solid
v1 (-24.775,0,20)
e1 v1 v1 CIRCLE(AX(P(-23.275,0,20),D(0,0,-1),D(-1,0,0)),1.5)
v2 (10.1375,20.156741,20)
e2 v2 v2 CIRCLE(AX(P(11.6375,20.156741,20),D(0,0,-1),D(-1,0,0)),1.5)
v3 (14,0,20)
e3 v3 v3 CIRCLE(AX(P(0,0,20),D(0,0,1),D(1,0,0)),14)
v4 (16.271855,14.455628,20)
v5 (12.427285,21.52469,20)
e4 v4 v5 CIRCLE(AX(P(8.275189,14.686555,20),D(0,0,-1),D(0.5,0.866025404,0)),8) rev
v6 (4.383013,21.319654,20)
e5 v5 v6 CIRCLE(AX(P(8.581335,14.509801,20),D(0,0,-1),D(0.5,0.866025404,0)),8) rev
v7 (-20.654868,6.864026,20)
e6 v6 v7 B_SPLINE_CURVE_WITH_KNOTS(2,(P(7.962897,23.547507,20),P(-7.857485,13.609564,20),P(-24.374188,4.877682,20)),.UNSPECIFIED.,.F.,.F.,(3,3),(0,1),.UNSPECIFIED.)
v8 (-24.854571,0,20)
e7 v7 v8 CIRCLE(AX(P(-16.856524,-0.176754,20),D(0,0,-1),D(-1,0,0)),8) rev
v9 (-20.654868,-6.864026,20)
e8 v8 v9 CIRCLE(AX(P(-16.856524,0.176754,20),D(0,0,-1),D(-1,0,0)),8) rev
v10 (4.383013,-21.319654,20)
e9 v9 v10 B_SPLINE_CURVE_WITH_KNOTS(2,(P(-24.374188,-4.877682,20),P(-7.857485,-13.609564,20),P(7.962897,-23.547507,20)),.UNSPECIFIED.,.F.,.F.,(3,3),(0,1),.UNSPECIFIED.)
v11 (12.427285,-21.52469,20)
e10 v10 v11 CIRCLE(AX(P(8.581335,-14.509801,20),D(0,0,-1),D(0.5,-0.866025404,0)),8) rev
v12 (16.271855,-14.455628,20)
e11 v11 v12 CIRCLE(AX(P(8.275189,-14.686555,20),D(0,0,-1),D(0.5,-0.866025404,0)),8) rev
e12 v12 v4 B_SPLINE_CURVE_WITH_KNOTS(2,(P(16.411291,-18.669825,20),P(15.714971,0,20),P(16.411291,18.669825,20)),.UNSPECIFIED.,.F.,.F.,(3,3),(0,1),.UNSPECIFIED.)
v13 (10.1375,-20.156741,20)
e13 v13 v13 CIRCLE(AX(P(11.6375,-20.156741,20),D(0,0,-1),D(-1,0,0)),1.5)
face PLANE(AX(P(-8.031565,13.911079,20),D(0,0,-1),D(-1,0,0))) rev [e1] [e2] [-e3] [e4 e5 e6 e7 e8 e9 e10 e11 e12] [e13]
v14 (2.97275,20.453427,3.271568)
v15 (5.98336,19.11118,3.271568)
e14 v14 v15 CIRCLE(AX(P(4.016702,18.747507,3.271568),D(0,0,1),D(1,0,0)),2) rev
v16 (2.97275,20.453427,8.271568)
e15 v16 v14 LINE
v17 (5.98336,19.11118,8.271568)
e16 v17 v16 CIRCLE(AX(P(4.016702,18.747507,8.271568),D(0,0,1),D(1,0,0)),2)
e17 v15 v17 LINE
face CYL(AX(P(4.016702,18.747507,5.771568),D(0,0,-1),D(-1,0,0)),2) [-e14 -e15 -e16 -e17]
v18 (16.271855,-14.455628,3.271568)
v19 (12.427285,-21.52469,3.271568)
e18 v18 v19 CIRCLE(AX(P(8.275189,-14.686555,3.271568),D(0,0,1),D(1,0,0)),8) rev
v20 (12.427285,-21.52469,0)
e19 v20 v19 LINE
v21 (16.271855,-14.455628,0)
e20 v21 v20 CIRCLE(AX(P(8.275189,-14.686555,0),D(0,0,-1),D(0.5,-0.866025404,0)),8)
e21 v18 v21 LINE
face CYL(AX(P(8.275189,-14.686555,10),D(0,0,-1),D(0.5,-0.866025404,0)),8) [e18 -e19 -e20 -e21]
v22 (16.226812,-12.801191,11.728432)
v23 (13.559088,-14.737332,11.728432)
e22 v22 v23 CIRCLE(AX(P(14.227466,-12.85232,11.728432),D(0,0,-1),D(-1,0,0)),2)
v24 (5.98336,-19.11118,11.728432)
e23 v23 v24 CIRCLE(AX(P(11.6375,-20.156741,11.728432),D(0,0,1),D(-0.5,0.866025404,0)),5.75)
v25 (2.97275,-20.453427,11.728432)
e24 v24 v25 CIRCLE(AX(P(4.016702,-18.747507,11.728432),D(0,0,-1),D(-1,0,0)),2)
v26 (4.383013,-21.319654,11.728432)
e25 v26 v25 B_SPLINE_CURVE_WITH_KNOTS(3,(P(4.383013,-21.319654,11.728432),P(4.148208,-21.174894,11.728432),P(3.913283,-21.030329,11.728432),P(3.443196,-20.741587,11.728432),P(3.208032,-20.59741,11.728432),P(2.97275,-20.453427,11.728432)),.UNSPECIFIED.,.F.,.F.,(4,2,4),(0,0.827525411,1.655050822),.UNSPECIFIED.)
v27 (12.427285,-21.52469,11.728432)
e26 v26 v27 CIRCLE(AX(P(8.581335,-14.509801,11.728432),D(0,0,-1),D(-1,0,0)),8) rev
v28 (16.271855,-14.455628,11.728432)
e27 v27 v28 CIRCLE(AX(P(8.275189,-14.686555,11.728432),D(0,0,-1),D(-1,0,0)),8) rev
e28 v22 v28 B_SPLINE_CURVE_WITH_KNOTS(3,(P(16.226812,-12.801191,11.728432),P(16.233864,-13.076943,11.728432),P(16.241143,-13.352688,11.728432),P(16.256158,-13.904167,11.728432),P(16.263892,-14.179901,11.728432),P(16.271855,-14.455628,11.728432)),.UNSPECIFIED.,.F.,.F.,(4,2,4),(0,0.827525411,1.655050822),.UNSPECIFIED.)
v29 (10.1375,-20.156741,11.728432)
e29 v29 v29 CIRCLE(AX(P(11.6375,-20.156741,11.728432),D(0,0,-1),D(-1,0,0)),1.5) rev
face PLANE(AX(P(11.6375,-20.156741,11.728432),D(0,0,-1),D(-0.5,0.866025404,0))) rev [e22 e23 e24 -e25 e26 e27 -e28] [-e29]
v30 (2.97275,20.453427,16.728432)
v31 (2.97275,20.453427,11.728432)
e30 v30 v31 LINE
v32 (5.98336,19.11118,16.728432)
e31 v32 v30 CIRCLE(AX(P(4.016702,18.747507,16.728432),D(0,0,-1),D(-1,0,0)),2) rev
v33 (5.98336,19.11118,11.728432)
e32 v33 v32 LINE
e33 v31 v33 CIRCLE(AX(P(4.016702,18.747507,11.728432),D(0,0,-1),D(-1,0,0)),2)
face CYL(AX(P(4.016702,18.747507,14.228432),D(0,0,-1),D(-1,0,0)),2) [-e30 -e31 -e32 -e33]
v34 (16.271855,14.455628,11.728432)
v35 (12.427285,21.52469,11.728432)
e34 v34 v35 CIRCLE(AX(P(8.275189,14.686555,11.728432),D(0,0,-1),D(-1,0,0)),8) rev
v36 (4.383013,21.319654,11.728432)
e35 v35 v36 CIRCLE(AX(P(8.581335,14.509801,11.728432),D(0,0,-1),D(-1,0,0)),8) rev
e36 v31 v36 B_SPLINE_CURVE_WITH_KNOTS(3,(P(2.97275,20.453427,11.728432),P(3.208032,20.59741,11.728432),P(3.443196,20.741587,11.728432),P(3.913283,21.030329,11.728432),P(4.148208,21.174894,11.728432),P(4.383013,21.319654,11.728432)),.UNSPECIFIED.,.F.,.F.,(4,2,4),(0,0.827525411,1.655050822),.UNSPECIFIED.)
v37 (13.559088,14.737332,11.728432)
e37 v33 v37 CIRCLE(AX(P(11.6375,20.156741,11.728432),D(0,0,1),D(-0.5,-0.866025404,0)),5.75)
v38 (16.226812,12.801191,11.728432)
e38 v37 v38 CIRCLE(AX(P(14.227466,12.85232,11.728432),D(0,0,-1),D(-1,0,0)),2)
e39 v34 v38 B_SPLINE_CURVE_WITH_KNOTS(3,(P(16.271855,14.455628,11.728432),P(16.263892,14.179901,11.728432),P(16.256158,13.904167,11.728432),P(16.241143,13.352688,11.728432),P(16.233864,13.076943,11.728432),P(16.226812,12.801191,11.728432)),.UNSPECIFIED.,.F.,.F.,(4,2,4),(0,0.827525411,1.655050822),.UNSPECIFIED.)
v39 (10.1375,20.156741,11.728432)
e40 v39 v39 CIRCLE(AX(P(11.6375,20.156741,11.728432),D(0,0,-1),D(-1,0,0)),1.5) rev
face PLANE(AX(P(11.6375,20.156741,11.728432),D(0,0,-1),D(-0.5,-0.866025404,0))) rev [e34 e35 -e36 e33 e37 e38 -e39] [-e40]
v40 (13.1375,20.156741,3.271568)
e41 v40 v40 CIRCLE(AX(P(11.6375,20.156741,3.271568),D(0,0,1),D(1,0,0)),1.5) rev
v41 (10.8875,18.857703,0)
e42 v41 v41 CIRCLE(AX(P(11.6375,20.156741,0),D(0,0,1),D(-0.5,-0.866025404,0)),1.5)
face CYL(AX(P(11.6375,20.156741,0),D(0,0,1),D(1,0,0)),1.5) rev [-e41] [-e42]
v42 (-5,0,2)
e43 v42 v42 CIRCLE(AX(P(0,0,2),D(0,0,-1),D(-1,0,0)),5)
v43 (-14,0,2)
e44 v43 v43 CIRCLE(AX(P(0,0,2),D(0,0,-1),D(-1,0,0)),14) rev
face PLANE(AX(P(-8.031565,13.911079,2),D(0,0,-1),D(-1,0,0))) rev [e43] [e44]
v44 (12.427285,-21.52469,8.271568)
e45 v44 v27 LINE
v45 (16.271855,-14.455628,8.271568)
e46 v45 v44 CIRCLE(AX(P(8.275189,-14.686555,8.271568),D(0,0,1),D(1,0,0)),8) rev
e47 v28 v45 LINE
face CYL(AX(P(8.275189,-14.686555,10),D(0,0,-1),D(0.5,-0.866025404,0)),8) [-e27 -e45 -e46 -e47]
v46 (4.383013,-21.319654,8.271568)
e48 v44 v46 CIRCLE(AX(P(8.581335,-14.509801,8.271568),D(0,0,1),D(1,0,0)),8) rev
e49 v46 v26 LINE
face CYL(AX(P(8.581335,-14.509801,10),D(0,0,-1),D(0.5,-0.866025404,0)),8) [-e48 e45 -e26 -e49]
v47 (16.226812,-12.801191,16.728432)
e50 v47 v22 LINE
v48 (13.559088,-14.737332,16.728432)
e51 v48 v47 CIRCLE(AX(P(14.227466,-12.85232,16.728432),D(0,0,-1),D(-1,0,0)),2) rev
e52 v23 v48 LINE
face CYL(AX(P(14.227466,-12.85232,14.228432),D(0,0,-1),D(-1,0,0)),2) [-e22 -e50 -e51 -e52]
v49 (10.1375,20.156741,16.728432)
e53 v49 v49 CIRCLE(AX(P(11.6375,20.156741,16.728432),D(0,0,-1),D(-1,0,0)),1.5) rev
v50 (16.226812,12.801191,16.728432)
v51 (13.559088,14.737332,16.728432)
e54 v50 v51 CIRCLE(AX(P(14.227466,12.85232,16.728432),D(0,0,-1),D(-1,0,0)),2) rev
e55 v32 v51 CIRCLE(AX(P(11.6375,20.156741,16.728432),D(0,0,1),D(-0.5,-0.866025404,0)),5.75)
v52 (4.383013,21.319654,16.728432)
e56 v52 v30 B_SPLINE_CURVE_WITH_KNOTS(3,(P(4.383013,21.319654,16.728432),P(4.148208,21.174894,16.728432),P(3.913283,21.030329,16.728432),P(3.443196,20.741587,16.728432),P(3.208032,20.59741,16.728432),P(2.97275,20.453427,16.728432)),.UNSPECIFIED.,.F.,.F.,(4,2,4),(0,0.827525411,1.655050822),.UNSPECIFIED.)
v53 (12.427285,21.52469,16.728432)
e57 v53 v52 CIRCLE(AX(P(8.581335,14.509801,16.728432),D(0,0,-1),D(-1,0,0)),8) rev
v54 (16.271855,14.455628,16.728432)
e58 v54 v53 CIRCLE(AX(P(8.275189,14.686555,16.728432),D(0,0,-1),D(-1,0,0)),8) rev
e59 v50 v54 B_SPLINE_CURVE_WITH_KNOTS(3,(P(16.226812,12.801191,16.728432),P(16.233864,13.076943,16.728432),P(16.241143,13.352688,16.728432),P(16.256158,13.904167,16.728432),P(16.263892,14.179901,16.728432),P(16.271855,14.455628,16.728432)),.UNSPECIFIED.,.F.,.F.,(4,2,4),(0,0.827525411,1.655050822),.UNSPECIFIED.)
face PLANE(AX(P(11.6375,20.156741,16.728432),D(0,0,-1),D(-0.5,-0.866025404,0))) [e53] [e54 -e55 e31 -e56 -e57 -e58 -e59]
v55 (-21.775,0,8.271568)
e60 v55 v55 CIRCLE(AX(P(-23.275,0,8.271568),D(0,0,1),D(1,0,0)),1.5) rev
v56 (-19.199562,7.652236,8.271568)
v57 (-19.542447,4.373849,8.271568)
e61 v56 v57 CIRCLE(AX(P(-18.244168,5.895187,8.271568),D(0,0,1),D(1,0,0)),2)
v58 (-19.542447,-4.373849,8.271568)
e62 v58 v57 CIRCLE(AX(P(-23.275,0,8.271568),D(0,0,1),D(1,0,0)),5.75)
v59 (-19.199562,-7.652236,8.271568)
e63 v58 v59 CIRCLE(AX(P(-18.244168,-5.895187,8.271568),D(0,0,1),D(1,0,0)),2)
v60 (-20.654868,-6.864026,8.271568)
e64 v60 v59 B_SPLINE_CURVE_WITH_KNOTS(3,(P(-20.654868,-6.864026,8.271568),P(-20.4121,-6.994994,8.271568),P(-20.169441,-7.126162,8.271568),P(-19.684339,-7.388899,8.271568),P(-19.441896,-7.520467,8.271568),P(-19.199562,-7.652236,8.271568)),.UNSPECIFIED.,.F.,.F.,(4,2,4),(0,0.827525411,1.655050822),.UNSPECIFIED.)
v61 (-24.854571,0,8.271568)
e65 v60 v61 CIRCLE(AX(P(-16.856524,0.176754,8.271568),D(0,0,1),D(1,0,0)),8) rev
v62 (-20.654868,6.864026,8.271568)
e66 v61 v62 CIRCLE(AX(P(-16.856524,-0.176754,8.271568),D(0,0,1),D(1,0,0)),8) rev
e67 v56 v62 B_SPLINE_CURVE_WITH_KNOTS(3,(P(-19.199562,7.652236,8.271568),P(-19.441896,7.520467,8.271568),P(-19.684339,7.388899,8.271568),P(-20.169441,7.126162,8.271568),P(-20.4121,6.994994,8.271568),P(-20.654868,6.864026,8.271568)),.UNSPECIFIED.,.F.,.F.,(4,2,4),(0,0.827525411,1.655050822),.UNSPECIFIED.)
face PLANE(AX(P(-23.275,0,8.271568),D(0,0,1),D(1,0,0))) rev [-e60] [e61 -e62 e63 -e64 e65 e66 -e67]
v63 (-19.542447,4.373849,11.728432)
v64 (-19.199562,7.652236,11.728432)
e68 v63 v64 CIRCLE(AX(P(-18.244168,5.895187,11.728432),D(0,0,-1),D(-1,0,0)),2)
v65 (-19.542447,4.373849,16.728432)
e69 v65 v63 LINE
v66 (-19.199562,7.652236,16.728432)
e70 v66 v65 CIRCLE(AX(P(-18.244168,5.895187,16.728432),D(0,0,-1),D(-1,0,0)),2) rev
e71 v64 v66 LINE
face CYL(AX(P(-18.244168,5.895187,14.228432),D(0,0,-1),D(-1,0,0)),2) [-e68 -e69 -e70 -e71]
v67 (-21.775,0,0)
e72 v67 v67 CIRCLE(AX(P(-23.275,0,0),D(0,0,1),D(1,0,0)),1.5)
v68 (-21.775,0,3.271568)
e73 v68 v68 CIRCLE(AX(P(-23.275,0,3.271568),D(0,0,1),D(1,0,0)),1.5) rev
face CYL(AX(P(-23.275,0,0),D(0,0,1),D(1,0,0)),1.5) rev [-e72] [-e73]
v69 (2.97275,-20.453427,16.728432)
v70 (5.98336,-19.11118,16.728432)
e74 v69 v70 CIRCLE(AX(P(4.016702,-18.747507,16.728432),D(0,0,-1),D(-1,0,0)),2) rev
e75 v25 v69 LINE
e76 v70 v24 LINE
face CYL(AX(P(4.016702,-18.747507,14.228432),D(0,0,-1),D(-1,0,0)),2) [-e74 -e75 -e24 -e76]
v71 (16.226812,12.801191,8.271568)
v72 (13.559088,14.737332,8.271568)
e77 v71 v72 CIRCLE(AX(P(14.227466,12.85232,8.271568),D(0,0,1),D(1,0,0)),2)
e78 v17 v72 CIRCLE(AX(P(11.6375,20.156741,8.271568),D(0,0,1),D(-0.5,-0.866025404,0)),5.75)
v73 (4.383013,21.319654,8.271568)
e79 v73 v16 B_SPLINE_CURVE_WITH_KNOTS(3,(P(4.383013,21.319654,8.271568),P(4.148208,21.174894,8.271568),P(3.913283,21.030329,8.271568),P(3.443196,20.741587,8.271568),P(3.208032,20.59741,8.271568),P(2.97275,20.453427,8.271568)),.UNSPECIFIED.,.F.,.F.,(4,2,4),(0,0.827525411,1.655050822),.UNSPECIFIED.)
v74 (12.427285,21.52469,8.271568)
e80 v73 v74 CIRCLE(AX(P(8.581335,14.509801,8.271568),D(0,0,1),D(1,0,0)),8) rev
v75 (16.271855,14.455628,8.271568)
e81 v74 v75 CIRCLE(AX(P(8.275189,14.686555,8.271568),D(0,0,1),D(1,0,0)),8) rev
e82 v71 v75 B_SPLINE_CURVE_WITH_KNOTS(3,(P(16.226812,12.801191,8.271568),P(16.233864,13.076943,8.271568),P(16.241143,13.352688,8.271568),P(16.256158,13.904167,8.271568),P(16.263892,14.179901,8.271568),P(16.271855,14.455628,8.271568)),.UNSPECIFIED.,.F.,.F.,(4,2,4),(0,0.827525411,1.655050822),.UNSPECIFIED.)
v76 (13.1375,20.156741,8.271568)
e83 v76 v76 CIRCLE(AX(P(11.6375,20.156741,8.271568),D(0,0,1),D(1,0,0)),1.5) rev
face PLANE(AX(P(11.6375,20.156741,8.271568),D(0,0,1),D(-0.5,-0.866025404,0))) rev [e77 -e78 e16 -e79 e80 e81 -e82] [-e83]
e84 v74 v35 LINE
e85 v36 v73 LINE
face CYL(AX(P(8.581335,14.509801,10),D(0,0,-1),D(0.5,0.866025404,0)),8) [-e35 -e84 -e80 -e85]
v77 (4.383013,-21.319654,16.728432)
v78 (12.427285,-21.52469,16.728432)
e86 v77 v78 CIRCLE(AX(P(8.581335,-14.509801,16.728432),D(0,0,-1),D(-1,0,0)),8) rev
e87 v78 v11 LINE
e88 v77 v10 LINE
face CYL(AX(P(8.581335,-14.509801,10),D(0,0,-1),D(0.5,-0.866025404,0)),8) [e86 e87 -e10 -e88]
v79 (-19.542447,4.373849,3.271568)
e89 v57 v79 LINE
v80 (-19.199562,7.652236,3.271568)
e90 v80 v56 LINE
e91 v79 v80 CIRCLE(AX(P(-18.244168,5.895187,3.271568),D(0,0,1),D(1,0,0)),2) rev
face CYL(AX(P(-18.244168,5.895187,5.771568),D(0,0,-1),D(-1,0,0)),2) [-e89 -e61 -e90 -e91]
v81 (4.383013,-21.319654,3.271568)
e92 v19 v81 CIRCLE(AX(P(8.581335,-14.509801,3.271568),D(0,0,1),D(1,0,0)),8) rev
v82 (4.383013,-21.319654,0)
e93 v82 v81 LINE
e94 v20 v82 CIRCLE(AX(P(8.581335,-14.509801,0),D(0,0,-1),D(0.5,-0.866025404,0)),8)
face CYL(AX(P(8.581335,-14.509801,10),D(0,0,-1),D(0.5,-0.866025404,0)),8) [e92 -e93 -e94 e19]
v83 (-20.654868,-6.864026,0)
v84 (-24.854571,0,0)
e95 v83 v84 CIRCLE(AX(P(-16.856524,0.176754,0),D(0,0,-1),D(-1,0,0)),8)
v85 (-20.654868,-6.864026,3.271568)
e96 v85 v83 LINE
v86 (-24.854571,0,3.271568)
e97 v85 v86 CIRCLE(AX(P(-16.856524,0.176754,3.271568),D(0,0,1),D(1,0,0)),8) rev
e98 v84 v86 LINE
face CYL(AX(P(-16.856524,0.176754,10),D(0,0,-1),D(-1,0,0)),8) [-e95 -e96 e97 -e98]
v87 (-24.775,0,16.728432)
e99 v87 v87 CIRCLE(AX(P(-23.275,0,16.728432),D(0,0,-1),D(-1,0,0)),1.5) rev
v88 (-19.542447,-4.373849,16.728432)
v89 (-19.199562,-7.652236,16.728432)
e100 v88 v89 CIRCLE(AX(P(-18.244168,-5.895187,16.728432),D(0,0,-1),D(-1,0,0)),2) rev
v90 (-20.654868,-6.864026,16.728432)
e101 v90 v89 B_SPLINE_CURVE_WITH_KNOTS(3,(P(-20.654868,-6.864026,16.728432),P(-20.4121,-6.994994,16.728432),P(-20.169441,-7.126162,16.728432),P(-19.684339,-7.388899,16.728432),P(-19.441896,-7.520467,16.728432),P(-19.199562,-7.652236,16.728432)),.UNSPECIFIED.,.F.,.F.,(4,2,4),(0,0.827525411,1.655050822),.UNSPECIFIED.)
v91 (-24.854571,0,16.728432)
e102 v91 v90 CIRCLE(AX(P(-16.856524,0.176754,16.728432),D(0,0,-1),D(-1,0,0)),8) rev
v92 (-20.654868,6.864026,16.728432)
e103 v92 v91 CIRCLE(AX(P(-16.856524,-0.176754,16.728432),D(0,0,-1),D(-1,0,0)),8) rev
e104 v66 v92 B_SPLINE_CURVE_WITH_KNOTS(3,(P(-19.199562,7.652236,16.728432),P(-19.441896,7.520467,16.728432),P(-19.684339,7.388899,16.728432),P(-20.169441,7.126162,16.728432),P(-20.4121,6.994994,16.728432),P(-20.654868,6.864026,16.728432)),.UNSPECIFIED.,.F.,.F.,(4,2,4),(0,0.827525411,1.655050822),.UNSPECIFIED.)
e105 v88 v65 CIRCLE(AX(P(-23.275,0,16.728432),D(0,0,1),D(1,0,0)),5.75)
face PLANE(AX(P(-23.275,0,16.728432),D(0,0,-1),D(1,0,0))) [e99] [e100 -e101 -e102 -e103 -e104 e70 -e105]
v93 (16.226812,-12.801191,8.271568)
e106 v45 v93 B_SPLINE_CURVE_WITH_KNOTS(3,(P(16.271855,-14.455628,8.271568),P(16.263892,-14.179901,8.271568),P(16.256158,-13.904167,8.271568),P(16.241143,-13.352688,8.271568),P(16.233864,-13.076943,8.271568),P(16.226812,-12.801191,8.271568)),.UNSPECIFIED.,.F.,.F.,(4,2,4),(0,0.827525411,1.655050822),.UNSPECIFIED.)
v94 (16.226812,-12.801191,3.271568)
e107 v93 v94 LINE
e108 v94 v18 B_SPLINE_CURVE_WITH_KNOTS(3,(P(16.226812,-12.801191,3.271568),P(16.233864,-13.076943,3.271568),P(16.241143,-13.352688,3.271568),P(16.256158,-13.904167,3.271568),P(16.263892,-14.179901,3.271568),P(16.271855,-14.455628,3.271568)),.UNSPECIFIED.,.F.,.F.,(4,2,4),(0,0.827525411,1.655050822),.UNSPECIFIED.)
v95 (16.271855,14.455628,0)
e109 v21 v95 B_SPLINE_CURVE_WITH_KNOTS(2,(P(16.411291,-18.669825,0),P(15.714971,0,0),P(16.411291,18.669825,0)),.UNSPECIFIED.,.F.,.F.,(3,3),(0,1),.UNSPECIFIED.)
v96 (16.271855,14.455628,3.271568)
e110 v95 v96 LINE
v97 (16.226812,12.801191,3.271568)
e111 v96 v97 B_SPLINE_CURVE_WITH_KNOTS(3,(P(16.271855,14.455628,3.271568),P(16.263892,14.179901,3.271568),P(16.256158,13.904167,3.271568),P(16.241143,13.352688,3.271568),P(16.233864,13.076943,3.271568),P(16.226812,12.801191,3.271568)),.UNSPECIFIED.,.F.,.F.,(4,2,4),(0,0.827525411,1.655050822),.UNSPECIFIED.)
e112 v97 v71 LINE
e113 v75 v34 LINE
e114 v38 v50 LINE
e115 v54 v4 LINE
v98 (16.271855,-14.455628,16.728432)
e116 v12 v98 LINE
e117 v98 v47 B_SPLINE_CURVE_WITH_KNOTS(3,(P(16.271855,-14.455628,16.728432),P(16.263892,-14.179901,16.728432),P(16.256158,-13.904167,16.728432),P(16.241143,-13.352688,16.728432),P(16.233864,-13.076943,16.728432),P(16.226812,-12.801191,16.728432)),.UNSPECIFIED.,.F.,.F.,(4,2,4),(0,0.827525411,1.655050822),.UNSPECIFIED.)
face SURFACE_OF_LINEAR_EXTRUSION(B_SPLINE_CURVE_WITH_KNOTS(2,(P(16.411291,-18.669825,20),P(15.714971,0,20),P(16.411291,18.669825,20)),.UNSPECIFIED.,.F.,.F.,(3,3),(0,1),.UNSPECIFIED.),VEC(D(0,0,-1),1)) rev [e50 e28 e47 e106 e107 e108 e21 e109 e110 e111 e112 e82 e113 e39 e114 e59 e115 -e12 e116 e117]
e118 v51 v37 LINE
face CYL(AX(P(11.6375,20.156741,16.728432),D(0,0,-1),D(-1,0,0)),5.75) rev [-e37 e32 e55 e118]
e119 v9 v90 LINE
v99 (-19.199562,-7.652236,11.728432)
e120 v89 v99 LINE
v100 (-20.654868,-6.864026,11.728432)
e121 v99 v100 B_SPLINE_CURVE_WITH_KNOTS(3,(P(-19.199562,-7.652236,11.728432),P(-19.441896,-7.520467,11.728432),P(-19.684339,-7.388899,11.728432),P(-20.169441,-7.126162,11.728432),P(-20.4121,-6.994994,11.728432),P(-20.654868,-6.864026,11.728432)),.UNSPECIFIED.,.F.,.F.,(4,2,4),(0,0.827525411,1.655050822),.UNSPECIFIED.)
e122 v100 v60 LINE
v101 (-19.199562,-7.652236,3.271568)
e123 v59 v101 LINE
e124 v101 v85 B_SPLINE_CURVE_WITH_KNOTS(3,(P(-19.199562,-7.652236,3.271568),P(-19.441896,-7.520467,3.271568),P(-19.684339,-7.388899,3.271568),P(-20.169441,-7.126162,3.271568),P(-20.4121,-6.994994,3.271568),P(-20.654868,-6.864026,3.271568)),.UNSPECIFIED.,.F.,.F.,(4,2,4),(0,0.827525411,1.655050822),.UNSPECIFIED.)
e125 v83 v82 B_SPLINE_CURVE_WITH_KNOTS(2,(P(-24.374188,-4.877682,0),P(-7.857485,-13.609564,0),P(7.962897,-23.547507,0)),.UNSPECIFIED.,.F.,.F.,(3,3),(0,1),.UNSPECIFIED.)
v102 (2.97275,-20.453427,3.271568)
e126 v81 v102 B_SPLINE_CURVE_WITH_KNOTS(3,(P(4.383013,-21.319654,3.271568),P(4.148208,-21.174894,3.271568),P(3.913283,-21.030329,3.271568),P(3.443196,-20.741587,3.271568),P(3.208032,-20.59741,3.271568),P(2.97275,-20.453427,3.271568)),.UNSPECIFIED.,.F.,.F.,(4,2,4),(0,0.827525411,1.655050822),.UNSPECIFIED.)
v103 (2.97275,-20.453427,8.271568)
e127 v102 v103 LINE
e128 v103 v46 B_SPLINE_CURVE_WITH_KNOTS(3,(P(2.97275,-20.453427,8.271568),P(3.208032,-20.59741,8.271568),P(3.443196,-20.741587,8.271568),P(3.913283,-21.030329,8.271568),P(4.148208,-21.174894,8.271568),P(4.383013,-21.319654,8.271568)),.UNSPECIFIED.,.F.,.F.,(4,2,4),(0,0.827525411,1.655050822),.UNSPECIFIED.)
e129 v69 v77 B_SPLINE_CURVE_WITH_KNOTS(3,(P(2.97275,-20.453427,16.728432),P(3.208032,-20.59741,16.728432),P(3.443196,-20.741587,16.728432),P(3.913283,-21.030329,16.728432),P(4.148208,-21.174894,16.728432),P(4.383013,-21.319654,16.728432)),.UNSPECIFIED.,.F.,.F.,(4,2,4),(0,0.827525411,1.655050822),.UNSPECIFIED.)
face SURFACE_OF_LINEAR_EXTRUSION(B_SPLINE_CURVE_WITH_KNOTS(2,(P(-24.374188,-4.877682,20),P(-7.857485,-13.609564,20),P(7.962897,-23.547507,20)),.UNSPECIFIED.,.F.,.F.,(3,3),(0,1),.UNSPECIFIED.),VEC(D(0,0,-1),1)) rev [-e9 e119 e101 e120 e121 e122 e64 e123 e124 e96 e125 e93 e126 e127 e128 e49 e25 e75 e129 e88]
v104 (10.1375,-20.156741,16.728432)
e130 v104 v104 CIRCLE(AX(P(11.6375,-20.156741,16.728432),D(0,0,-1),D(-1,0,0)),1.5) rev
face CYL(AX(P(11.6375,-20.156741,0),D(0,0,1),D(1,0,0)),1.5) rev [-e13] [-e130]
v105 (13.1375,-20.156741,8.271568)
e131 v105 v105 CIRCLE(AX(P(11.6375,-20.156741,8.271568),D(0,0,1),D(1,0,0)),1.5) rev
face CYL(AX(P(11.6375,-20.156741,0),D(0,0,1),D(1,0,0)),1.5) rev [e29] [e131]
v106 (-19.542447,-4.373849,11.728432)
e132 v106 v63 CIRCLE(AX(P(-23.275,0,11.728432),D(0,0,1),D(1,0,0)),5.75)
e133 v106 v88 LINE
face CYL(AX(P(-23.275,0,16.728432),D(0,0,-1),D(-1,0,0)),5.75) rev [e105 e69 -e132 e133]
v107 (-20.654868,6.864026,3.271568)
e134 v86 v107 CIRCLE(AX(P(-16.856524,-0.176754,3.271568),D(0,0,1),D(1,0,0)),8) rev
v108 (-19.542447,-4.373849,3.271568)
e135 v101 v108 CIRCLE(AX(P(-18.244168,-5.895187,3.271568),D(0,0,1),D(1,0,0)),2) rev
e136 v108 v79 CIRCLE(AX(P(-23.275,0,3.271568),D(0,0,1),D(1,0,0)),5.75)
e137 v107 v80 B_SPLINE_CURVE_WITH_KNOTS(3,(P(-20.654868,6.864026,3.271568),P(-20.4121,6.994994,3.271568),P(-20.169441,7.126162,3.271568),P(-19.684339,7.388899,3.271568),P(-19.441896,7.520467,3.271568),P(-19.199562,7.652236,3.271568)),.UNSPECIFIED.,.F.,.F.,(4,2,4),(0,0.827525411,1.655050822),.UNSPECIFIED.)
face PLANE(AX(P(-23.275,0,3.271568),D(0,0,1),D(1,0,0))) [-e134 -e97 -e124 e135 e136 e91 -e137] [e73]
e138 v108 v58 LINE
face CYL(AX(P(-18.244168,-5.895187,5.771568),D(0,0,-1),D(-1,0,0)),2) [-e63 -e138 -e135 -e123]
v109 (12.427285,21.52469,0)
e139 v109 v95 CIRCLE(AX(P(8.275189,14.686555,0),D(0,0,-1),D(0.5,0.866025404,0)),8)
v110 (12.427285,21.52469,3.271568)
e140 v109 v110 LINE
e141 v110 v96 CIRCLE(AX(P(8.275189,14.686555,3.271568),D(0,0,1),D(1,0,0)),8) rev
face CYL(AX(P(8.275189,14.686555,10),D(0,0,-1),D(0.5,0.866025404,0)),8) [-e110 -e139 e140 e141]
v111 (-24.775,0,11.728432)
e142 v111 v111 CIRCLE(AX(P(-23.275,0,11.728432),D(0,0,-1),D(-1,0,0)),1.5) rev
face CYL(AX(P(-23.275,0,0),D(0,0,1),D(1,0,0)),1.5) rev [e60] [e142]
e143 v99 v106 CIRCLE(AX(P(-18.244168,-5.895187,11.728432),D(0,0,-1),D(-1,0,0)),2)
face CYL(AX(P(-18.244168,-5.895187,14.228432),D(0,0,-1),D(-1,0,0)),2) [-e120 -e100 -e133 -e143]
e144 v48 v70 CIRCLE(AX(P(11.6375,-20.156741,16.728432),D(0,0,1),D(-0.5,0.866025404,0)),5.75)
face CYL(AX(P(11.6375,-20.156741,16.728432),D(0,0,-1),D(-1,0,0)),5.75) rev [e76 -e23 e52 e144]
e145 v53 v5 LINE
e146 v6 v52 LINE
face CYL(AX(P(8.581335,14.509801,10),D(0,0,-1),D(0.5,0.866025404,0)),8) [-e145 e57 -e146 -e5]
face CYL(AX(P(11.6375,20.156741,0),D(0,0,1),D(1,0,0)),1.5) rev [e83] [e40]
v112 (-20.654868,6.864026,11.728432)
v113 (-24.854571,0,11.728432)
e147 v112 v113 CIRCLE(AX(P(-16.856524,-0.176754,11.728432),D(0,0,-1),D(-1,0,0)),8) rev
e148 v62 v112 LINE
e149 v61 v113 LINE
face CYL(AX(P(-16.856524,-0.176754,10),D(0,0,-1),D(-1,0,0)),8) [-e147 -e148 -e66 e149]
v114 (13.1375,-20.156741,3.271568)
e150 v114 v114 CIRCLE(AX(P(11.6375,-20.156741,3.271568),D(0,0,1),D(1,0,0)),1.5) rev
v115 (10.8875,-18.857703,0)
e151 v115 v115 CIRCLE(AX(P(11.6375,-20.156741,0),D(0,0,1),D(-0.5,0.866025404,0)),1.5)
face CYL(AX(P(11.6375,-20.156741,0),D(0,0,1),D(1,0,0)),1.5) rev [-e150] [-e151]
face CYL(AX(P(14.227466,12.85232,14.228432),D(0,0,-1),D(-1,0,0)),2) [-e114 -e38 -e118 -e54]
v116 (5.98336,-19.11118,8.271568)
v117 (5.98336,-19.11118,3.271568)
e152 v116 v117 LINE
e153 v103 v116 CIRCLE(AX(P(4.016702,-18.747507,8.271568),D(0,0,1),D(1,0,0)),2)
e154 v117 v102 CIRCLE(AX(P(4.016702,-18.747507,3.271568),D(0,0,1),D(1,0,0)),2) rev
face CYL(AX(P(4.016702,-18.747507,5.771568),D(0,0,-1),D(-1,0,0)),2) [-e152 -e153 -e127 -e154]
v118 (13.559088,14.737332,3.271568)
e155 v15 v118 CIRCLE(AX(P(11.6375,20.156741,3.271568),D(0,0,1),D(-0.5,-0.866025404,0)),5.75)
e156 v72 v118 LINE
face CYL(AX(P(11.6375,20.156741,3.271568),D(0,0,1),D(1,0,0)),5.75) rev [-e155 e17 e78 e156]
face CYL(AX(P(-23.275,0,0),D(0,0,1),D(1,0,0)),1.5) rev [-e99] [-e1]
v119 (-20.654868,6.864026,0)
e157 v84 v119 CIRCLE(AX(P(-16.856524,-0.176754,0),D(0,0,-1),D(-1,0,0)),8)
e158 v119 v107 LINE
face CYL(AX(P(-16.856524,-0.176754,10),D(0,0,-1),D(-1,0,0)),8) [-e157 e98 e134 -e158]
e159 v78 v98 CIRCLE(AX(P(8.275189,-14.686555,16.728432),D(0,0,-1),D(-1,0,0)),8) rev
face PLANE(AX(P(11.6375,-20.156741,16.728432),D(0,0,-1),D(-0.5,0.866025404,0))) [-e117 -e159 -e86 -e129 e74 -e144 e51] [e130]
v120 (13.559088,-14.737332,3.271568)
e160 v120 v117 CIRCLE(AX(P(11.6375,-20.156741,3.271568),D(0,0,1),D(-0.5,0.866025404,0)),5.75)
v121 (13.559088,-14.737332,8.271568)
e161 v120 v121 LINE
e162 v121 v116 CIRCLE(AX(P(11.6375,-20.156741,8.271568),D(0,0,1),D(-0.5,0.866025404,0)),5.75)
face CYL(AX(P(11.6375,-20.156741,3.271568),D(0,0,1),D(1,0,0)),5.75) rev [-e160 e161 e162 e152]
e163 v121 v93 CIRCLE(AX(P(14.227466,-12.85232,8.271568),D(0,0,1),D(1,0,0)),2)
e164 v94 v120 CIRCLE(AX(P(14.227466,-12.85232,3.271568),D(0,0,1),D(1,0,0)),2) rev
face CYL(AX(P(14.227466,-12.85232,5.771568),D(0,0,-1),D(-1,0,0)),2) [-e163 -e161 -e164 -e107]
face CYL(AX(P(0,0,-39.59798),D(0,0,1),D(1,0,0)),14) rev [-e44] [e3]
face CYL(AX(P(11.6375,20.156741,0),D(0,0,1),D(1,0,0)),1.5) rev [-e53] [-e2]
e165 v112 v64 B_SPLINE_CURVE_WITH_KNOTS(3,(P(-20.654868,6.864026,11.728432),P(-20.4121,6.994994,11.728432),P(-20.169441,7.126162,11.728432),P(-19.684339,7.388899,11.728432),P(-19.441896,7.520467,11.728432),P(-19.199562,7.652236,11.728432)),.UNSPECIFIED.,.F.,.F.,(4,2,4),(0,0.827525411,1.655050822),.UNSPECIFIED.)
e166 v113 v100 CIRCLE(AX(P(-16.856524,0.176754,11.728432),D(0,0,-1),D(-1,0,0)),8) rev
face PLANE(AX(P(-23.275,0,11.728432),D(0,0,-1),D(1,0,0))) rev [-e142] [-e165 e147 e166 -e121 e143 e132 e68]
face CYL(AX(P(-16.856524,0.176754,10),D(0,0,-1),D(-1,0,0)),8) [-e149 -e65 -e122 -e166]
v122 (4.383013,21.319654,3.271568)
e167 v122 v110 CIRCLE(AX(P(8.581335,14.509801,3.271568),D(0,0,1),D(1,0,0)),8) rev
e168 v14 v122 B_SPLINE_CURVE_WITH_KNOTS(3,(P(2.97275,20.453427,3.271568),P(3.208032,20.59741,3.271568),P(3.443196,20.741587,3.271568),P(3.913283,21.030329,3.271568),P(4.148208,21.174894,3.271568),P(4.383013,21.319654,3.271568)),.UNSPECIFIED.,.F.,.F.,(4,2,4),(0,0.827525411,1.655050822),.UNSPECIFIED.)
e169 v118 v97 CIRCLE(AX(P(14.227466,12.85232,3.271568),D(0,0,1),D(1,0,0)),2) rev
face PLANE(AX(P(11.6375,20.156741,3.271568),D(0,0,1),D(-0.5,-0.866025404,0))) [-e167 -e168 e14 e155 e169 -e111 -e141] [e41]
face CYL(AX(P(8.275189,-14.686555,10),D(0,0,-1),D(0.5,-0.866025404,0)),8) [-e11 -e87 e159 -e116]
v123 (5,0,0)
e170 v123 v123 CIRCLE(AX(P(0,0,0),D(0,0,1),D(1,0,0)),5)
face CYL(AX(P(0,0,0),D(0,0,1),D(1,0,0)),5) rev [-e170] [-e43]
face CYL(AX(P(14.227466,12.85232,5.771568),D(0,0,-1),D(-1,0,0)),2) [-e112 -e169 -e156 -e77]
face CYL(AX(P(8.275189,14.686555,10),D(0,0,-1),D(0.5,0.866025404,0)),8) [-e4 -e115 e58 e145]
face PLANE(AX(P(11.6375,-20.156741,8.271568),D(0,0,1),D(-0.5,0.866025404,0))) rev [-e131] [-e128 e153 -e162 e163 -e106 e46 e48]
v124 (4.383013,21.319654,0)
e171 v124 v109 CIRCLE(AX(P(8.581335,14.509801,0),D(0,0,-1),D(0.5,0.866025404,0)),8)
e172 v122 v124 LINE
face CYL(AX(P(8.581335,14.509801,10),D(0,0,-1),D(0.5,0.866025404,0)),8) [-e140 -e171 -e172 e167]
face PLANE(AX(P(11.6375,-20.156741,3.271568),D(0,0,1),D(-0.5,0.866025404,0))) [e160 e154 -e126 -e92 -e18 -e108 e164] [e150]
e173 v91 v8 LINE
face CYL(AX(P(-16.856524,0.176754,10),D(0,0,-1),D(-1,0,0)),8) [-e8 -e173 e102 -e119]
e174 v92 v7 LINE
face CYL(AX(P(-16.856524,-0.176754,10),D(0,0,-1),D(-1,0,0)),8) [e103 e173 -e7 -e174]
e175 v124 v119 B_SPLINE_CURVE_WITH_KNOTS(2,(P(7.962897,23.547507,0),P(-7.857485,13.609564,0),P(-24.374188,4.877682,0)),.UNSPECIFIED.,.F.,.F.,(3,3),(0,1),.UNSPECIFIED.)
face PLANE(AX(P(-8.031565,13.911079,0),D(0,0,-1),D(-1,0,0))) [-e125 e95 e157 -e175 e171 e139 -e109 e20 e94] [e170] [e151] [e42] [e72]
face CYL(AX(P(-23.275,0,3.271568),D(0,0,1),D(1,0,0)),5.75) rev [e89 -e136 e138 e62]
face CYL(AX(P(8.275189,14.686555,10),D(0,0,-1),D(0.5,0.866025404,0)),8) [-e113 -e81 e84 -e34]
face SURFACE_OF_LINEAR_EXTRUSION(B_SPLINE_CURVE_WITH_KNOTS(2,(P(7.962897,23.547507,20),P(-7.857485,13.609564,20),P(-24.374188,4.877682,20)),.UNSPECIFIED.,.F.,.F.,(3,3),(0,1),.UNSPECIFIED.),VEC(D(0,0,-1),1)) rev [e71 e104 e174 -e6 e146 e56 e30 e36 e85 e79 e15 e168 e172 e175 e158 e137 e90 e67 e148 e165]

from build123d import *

# Parameters (mm, degrees)
BOSS_EXTRUDE1_DEPTH     = 20
SKETCH4_R               = 14
CUT_EXTRUDE3_DEPTH      = 18
CUT_EXTRUDE4_DEPTH      = 39.683044831
CUT_EXTRUDE4_DEPTH_BACK = 39.683044831
SKETCH5_R               = 5
FILLET2_R               = 8
CIRPATTERN2_DEPTH       = 20
SKETCH2_R               = 1.5
CUT_EXTRUDE1_DEPTH      = 40.044088383
CIRPATTERN10_COUNT      = 3
SKETCH3_R               = 5.75
CUT_EXTRUDE2_DEPTH      = 2.5
CIRPATTERN3_COUNT       = 3
FILLET3_R               = 2
MIRROR1_START           = 11.728432102
MIRROR1_OUTLINE_R       = 1.5
MIRROR1_DEPTH           = 5


# Read off the part's stored shape, not the designer's step: CirPattern2, Mirror1
with BuildPart() as part:
    # Sketch1 → Boss-Extrude1 (new body)
    with BuildSketch(Plane.XY):
        with BuildLine():
            ThreePointArc((-24.374188266, 4.877682355), (-24.857450368, 0), (-24.374188266, -4.877682355))
            add(Edge.make_bspline(
                [(7.962897302, -23.547507412), (-7.857485411, -13.609563951), (-24.374188266, -4.877682355)],
                knots=[0, 0, 0, 1, 1, 1], degree=2))
            ThreePointArc((7.962897302, -23.547507412), (12.428725184, -21.527183492), (16.411290964, -18.669825058))
            add(Edge.make_bspline(
                [(16.411290964, 18.669825058), (15.714970822, 0), (16.411290964, -18.669825058)],
                knots=[0, 0, 0, 1, 1, 1], degree=2))
            ThreePointArc((16.411290964, 18.669825058), (12.428725184, 21.527183492), (7.962897302, 23.547507412))
            add(Edge.make_bspline(
                [(-24.374188266, 4.877682355), (-7.857485411, 13.609563951), (7.962897302, 23.547507412)],
                knots=[0, 0, 0, 1, 1, 1], degree=2))
        make_face()
    extrude(amount=BOSS_EXTRUDE1_DEPTH)

    # Sketch4 → Cut-Extrude3 (cut)
    with BuildSketch(Plane.XY.offset(20)):
        Circle(SKETCH4_R)
    extrude(amount=-CUT_EXTRUDE3_DEPTH, mode=Mode.SUBTRACT)

    # Sketch5 → Cut-Extrude4 (cut, two sides: drawn at the far end of the back side and taken through both)
    with BuildSketch(Plane.XY.offset(2).offset(-CUT_EXTRUDE4_DEPTH_BACK)):
        Circle(SKETCH5_R)
    extrude(amount=CUT_EXTRUDE4_DEPTH + CUT_EXTRUDE4_DEPTH_BACK, mode=Mode.SUBTRACT)

    # Fillet2
    # the kernel refuses this fillet: 8 mm, written as the material it takes off along each edge
    with BuildSketch(Plane(origin=(-24.374188266, -4.877682355, -12.902163969), x_dir=(-0.09337496736268357, 0.9956310137144271, 0), z_dir=(0, 0, 1))) as fillet2_piece_1:
        with BuildLine():
            CenterArc((4.330391744, -7.956777815), FILLET2_R, 84.041434424, 62.254890411)
            ThreePointArc((-2.324956501, -3.517595487), (-1.158780615, -1.761241696), (0, 0))
            ThreePointArc((0, 0), (2.580432794, 0.134299165), (5.160865588, 0))
        make_face()
    extrude(amount=45.804327938, mode=Mode.SUBTRACT)
    with BuildSketch(Plane(origin=(-24.374188266, 4.877682355, -12.902163969), x_dir=(0.8820863080273184, 0.4710878317158435, 0), z_dir=(0, 0, 1))) as fillet2_piece_2:
        with BuildLine():
            CenterArc((4.250145603, -7.999929262), FILLET2_R, 90.240945395, 62.254890411)
            ThreePointArc((-2.845672568, -4.30542463), (-1.534874647, -2.078660503), (0, 0))
            ThreePointArc((0, 0), (2.108251688, -0.004432315), (4.216503379, 0))
        make_face()
    extrude(amount=45.804327938, mode=Mode.SUBTRACT)

    # CirPattern2 outline → CirPattern2 (cut)
    with BuildSketch(Plane.XY):
        with BuildLine():
            add(Edge.make_bspline(
                [(16.411290964, -18.669825058), (16.332703446, -16.562726441), (16.27185489, -14.455627824)],
                knots=[0, 0, 0, 0.112861187, 0.112861187, 0.112861187], degree=2))
            ThreePointArc((16.27185489, -14.455627824), (15.303063117, -18.508724044), (12.427285417, -21.524689742))
            ThreePointArc((12.427285417, -21.524689742), (8.377493655, -22.507203437), (4.383013478, -21.319653613))
            add(Edge.make_bspline(
                [(4.383013478, -21.319653613), (6.17739013, -22.425899317), (7.962897302, -23.547507412)],
                knots=[0.887138813, 0.887138813, 0.887138813, 1, 1, 1], degree=2))
            ThreePointArc((7.962897302, -23.547507412), (12.428725184, -21.527183492), (16.411290964, -18.669825058))
        make_face()
        with BuildLine():
            ThreePointArc((12.427285417, 21.524689742), (15.303063117, 18.508724044), (16.271854889, 14.455627824))
            add(Edge.make_bspline(
                [(16.271854889, 14.455627824), (16.332703446, 16.562726441), (16.411290964, 18.669825058)],
                knots=[0.887138813, 0.887138813, 0.887138813, 1, 1, 1], degree=2))
            ThreePointArc((16.411290964, 18.669825058), (12.428725184, 21.527183492), (7.962897302, 23.547507412))
            add(Edge.make_bspline(
                [(7.962897302, 23.547507412), (6.17739013, 22.425899317), (4.383013478, 21.319653613)],
                knots=[0, 0, 0, 0.112861187, 0.112861187, 0.112861187], degree=2))
            ThreePointArc((4.383013478, 21.319653613), (8.377493655, 22.507203437), (12.427285417, 21.524689742))
        make_face()
    extrude(amount=CIRPATTERN2_DEPTH, mode=Mode.SUBTRACT)

    # Sketch2 → Cut-Extrude1 (cut, symmetric)
    with BuildSketch(Plane.XY.offset(20)):
        with Locations((-23.275, 0)):
            Circle(SKETCH2_R)
    cut_extrude1 = extrude(amount=CUT_EXTRUDE1_DEPTH, both=True, mode=Mode.SUBTRACT)

    # CirPattern10: Cut-Extrude1 ×3 about axis
    cirpattern10_axis = Axis((0, 0, 0), (0, 0, 1))
    for i in range(1, CIRPATTERN10_COUNT):
        add(cut_extrude1.rotate(cirpattern10_axis, i * 360 / CIRPATTERN10_COUNT), mode=Mode.SUBTRACT)

    # Sketch3 → Cut-Extrude2 (cut, symmetric)
    with BuildSketch(Plane.XY.offset(5.771567898)):
        with Locations((-23.275, 0)):
            Circle(SKETCH3_R)
    cut_extrude2 = extrude(amount=CUT_EXTRUDE2_DEPTH, both=True, mode=Mode.SUBTRACT)

    # CirPattern3: Cut-Extrude2 ×3 about axis
    cirpattern3_axis = Axis((0, 0, 0), (0, 0, 1))
    for i in range(1, CIRPATTERN3_COUNT):
        add(cut_extrude2.rotate(cirpattern3_axis, i * 360 / CIRPATTERN3_COUNT), mode=Mode.SUBTRACT)

    # Fillet3
    # the kernel refuses this fillet: 2 mm, written as the material it takes off along each edge
    with BuildSketch(Plane(origin=(6.2485352, -22.162123627, 8.271567898), x_dir=(-0.08658943128363263, 0.9962440817339779, 0), z_dir=(0, 0, -1))) as fillet3_piece_1:
        with BuildLine():
            CenterArc((3.595045079, -1.927780593), FILLET3_R, 105.444191658, 110.988134016)
            Line((1.985927342, -3.115526403), (1.825015568, -3.234300984))
            ThreePointArc((1.825015568, -3.234300984), (0.840321599, -1.904871336), (-0.185539637, -0.074666211))
            Line((-0.185539637, -0.074666211), (0.053259927, 0.192778059))
            ThreePointArc((0.053259927, 0.192778059), (1.531222904, -0.007630794), (3.009185881, 0.192778059))
            Line((3.009185881, 0.192778059), (3.062445808, 0))
        make_face()
    extrude(amount=5, mode=Mode.SUBTRACT)
    with BuildSketch(Plane(origin=(16.068694463, -16.492452033, 8.271567898), x_dir=(-0.8194779675021495, 0.5731106880686713, 0), z_dir=(0, 0, -1))) as fillet3_piece_2:
        with BuildLine():
            CenterArc((3.595045079, 1.927780593), FILLET3_R, 143.567674325, 110.988134016)
            Line((1.985927342, 3.115526403), (1.825015569, 3.234300984))
            ThreePointArc((1.825015569, 3.234300984), (0.840321599, 1.904871335), (-0.185539637, 0.074666211))
            Line((-0.185539637, 0.074666211), (0.053259927, -0.192778059))
            ThreePointArc((0.053259927, -0.192778059), (1.531222904, 0.007630794), (3.009185881, -0.192778059))
            Line((3.009185881, -0.192778059), (3.062445808, 0))
        make_face()
    extrude(amount=5, mode=Mode.SUBTRACT)
    with BuildSketch(Plane(origin=(16.068694462, 16.492452033, 8.271567898), x_dir=(-0.8194779675271912, -0.573110688032865, 0), z_dir=(0, 0, -1))) as fillet3_piece_3:
        with BuildLine():
            CenterArc((3.595045079, -1.927780593), FILLET3_R, 105.444191656, 110.988134016)
            Line((1.985927342, -3.115526403), (1.825015568, -3.234300984))
            ThreePointArc((1.825015568, -3.234300984), (0.840321598, -1.904871335), (-0.185539637, -0.074666211))
            Line((-0.185539637, -0.074666211), (0.053259927, 0.192778059))
            ThreePointArc((0.053259927, 0.192778059), (1.531222904, -0.007630794), (3.009185881, 0.192778059))
            Line((3.009185881, 0.192778059), (3.062445808, 0))
        make_face()
    extrude(amount=5, mode=Mode.SUBTRACT)
    with BuildSketch(Plane(origin=(6.2485352, 22.162123627, 8.271567898), x_dir=(-0.08658943128363542, -0.9962440817339778, 0), z_dir=(0, 0, -1))) as fillet3_piece_4:
        with BuildLine():
            CenterArc((3.595045079, 1.927780593), FILLET3_R, 143.567674326, 110.988134016)
            Line((1.985927342, 3.115526403), (1.825015568, 3.234300984))
            ThreePointArc((1.825015568, 3.234300984), (0.840321599, 1.904871336), (-0.185539637, 0.074666211))
            Line((-0.185539637, 0.074666211), (0.053259927, -0.192778059))
            ThreePointArc((0.053259927, -0.192778059), (1.531222904, 0.007630794), (3.009185881, -0.192778059))
            Line((3.009185881, -0.192778059), (3.062445808, 0))
        make_face()
    extrude(amount=5, mode=Mode.SUBTRACT)
    with BuildSketch(Plane(origin=(-22.317229663, 5.669671594, 8.271567898), x_dir=(0.9060673988031184, -0.4231333936551814, 0), z_dir=(0, 0, -1))) as fillet3_piece_5:
        with BuildLine():
            CenterArc((3.59504508, -1.927780593), FILLET3_R, 105.444191659, 110.988134016)
            Line((1.985927342, -3.115526403), (1.825015569, -3.234300984))
            ThreePointArc((1.825015569, -3.234300984), (0.840321599, -1.904871336), (-0.185539637, -0.074666211))
            Line((-0.185539637, -0.074666211), (0.053259927, 0.192778059))
            ThreePointArc((0.053259927, 0.192778059), (1.531222904, -0.007630794), (3.009185881, 0.192778059))
            Line((3.009185881, 0.192778059), (3.062445809, 0))
        make_face()
    extrude(amount=5, mode=Mode.SUBTRACT)
    with BuildSketch(Plane(origin=(-22.317229663, -5.669671594, 8.271567898), x_dir=(0.9060673988030417, 0.423133393655346, 0), z_dir=(0, 0, -1))) as fillet3_piece_6:
        with BuildLine():
            CenterArc((3.59504508, 1.927780593), FILLET3_R, 143.567674325, 110.988134016)
            Line((1.985927342, 3.115526403), (1.825015569, 3.234300984))
            ThreePointArc((1.825015569, 3.234300984), (0.840321599, 1.904871336), (-0.185539637, 0.074666211))
            Line((-0.185539637, 0.074666211), (0.053259927, -0.192778059))
            ThreePointArc((0.053259927, -0.192778059), (1.531222904, 0.007630794), (3.009185881, -0.192778059))
            Line((3.009185881, -0.192778059), (3.062445809, 0))
        make_face()
    extrude(amount=5, mode=Mode.SUBTRACT)

    # Mirror1 outline → Mirror1 (cut)
    # profile 1 of 3: a face of its own
    with BuildSketch(Plane.XY.offset(MIRROR1_START)):
        with BuildLine():
            ThreePointArc((-19.542447355, -4.373848506), (-17.525, 0), (-19.542447355, 4.373848506))
            ThreePointArc((-19.542447355, 4.373848506), (-20.233318144, 6.103231336), (-19.199562382, 7.652236322))
            add(Edge.make_bspline(
                [(-19.199562382, 7.652236322), (-19.926531874, 7.256947197), (-20.654868368, 6.864025789)],
                knots=[0.842831027, 0.842831027, 0.842831027, 0.887138813, 0.887138813, 0.887138813], degree=2))
            ThreePointArc((-20.654868368, 6.864025789), (-23.680556773, 3.998479393), (-24.854570834, 0))
            ThreePointArc((-24.854570834, 0), (-23.680556773, -3.998479393), (-20.654868368, -6.864025789))
            add(Edge.make_bspline(
                [(-20.654868368, -6.864025789), (-19.926531874, -7.256947197), (-19.199562382, -7.652236322)],
                knots=[0.112861187, 0.112861187, 0.112861187, 0.157168973, 0.157168973, 0.157168973], degree=2))
            ThreePointArc((-19.199562382, -7.652236322), (-20.233318144, -6.103231336), (-19.542447355, -4.373848506))
        make_face()
        with Locations((-23.275, 0)):
            Circle(MIRROR1_OUTLINE_R, mode=Mode.SUBTRACT)
    # profile 2 of 3: a face of its own
    with BuildSketch(Plane.XY.offset(MIRROR1_START)):
        with BuildLine():
            add(Edge.make_bspline(
                [(4.383013478, 21.319653613), (3.67856531, 20.885356411), (2.97275014, 20.453426925)],
                knots=[0.112861187, 0.112861187, 0.112861187, 0.157168973, 0.157168973, 0.157168973], degree=2))
            ThreePointArc((2.97275014, 20.453426925), (4.831105689, 20.574183184), (5.983359759, 19.111180115))
            ThreePointArc((5.983359759, 19.111180115), (8.7625, 15.177095201), (13.559087596, 14.737331609))
            ThreePointArc((13.559087596, 14.737331609), (15.402212454, 14.470951847), (16.226812241, 12.801190603))
            add(Edge.make_bspline(
                [(16.226812241, 12.801190603), (16.247966564, 13.628409213), (16.271854889, 14.455627824)],
                knots=[0.842831027, 0.842831027, 0.842831027, 0.887138813, 0.887138813, 0.887138813], degree=2))
            ThreePointArc((16.271854889, 14.455627824), (15.303063117, 18.508724044), (12.427285417, 21.524689742))
            ThreePointArc((12.427285417, 21.524689742), (8.377493655, 22.507203437), (4.383013478, 21.319653613))
        make_face()
        with Locations((11.6375, 20.156741273)):
            Circle(MIRROR1_OUTLINE_R, mode=Mode.SUBTRACT)
    # profile 3 of 3: a face of its own
    with BuildSketch(Plane.XY.offset(MIRROR1_START)):
        with BuildLine():
            ThreePointArc((5.983359759, -19.111180115), (4.831105689, -20.574183184), (2.97275014, -20.453426925))
            add(Edge.make_bspline(
                [(2.97275014, -20.453426925), (3.67856531, -20.885356411), (4.383013478, -21.319653613)],
                knots=[0.842831027, 0.842831027, 0.842831027, 0.887138813, 0.887138813, 0.887138813], degree=2))
            ThreePointArc((4.383013478, -21.319653613), (8.377493655, -22.507203437), (12.427285417, -21.524689742))
            ThreePointArc((12.427285417, -21.524689742), (15.303063117, -18.508724044), (16.271854889, -14.455627824))
            add(Edge.make_bspline(
                [(16.271854889, -14.455627824), (16.247966564, -13.628409213), (16.226812241, -12.801190603)],
                knots=[0.112861187, 0.112861187, 0.112861187, 0.157168973, 0.157168973, 0.157168973], degree=2))
            ThreePointArc((16.226812241, -12.801190603), (15.402212454, -14.470951847), (13.559087596, -14.737331609))
            ThreePointArc((13.559087596, -14.737331609), (8.7625, -15.177095201), (5.983359759, -19.111180115))
        make_face()
        with Locations((11.6375, -20.156741273)):
            Circle(MIRROR1_OUTLINE_R, mode=Mode.SUBTRACT)
    extrude(amount=MIRROR1_DEPTH, mode=Mode.SUBTRACT)


solid = part.part
